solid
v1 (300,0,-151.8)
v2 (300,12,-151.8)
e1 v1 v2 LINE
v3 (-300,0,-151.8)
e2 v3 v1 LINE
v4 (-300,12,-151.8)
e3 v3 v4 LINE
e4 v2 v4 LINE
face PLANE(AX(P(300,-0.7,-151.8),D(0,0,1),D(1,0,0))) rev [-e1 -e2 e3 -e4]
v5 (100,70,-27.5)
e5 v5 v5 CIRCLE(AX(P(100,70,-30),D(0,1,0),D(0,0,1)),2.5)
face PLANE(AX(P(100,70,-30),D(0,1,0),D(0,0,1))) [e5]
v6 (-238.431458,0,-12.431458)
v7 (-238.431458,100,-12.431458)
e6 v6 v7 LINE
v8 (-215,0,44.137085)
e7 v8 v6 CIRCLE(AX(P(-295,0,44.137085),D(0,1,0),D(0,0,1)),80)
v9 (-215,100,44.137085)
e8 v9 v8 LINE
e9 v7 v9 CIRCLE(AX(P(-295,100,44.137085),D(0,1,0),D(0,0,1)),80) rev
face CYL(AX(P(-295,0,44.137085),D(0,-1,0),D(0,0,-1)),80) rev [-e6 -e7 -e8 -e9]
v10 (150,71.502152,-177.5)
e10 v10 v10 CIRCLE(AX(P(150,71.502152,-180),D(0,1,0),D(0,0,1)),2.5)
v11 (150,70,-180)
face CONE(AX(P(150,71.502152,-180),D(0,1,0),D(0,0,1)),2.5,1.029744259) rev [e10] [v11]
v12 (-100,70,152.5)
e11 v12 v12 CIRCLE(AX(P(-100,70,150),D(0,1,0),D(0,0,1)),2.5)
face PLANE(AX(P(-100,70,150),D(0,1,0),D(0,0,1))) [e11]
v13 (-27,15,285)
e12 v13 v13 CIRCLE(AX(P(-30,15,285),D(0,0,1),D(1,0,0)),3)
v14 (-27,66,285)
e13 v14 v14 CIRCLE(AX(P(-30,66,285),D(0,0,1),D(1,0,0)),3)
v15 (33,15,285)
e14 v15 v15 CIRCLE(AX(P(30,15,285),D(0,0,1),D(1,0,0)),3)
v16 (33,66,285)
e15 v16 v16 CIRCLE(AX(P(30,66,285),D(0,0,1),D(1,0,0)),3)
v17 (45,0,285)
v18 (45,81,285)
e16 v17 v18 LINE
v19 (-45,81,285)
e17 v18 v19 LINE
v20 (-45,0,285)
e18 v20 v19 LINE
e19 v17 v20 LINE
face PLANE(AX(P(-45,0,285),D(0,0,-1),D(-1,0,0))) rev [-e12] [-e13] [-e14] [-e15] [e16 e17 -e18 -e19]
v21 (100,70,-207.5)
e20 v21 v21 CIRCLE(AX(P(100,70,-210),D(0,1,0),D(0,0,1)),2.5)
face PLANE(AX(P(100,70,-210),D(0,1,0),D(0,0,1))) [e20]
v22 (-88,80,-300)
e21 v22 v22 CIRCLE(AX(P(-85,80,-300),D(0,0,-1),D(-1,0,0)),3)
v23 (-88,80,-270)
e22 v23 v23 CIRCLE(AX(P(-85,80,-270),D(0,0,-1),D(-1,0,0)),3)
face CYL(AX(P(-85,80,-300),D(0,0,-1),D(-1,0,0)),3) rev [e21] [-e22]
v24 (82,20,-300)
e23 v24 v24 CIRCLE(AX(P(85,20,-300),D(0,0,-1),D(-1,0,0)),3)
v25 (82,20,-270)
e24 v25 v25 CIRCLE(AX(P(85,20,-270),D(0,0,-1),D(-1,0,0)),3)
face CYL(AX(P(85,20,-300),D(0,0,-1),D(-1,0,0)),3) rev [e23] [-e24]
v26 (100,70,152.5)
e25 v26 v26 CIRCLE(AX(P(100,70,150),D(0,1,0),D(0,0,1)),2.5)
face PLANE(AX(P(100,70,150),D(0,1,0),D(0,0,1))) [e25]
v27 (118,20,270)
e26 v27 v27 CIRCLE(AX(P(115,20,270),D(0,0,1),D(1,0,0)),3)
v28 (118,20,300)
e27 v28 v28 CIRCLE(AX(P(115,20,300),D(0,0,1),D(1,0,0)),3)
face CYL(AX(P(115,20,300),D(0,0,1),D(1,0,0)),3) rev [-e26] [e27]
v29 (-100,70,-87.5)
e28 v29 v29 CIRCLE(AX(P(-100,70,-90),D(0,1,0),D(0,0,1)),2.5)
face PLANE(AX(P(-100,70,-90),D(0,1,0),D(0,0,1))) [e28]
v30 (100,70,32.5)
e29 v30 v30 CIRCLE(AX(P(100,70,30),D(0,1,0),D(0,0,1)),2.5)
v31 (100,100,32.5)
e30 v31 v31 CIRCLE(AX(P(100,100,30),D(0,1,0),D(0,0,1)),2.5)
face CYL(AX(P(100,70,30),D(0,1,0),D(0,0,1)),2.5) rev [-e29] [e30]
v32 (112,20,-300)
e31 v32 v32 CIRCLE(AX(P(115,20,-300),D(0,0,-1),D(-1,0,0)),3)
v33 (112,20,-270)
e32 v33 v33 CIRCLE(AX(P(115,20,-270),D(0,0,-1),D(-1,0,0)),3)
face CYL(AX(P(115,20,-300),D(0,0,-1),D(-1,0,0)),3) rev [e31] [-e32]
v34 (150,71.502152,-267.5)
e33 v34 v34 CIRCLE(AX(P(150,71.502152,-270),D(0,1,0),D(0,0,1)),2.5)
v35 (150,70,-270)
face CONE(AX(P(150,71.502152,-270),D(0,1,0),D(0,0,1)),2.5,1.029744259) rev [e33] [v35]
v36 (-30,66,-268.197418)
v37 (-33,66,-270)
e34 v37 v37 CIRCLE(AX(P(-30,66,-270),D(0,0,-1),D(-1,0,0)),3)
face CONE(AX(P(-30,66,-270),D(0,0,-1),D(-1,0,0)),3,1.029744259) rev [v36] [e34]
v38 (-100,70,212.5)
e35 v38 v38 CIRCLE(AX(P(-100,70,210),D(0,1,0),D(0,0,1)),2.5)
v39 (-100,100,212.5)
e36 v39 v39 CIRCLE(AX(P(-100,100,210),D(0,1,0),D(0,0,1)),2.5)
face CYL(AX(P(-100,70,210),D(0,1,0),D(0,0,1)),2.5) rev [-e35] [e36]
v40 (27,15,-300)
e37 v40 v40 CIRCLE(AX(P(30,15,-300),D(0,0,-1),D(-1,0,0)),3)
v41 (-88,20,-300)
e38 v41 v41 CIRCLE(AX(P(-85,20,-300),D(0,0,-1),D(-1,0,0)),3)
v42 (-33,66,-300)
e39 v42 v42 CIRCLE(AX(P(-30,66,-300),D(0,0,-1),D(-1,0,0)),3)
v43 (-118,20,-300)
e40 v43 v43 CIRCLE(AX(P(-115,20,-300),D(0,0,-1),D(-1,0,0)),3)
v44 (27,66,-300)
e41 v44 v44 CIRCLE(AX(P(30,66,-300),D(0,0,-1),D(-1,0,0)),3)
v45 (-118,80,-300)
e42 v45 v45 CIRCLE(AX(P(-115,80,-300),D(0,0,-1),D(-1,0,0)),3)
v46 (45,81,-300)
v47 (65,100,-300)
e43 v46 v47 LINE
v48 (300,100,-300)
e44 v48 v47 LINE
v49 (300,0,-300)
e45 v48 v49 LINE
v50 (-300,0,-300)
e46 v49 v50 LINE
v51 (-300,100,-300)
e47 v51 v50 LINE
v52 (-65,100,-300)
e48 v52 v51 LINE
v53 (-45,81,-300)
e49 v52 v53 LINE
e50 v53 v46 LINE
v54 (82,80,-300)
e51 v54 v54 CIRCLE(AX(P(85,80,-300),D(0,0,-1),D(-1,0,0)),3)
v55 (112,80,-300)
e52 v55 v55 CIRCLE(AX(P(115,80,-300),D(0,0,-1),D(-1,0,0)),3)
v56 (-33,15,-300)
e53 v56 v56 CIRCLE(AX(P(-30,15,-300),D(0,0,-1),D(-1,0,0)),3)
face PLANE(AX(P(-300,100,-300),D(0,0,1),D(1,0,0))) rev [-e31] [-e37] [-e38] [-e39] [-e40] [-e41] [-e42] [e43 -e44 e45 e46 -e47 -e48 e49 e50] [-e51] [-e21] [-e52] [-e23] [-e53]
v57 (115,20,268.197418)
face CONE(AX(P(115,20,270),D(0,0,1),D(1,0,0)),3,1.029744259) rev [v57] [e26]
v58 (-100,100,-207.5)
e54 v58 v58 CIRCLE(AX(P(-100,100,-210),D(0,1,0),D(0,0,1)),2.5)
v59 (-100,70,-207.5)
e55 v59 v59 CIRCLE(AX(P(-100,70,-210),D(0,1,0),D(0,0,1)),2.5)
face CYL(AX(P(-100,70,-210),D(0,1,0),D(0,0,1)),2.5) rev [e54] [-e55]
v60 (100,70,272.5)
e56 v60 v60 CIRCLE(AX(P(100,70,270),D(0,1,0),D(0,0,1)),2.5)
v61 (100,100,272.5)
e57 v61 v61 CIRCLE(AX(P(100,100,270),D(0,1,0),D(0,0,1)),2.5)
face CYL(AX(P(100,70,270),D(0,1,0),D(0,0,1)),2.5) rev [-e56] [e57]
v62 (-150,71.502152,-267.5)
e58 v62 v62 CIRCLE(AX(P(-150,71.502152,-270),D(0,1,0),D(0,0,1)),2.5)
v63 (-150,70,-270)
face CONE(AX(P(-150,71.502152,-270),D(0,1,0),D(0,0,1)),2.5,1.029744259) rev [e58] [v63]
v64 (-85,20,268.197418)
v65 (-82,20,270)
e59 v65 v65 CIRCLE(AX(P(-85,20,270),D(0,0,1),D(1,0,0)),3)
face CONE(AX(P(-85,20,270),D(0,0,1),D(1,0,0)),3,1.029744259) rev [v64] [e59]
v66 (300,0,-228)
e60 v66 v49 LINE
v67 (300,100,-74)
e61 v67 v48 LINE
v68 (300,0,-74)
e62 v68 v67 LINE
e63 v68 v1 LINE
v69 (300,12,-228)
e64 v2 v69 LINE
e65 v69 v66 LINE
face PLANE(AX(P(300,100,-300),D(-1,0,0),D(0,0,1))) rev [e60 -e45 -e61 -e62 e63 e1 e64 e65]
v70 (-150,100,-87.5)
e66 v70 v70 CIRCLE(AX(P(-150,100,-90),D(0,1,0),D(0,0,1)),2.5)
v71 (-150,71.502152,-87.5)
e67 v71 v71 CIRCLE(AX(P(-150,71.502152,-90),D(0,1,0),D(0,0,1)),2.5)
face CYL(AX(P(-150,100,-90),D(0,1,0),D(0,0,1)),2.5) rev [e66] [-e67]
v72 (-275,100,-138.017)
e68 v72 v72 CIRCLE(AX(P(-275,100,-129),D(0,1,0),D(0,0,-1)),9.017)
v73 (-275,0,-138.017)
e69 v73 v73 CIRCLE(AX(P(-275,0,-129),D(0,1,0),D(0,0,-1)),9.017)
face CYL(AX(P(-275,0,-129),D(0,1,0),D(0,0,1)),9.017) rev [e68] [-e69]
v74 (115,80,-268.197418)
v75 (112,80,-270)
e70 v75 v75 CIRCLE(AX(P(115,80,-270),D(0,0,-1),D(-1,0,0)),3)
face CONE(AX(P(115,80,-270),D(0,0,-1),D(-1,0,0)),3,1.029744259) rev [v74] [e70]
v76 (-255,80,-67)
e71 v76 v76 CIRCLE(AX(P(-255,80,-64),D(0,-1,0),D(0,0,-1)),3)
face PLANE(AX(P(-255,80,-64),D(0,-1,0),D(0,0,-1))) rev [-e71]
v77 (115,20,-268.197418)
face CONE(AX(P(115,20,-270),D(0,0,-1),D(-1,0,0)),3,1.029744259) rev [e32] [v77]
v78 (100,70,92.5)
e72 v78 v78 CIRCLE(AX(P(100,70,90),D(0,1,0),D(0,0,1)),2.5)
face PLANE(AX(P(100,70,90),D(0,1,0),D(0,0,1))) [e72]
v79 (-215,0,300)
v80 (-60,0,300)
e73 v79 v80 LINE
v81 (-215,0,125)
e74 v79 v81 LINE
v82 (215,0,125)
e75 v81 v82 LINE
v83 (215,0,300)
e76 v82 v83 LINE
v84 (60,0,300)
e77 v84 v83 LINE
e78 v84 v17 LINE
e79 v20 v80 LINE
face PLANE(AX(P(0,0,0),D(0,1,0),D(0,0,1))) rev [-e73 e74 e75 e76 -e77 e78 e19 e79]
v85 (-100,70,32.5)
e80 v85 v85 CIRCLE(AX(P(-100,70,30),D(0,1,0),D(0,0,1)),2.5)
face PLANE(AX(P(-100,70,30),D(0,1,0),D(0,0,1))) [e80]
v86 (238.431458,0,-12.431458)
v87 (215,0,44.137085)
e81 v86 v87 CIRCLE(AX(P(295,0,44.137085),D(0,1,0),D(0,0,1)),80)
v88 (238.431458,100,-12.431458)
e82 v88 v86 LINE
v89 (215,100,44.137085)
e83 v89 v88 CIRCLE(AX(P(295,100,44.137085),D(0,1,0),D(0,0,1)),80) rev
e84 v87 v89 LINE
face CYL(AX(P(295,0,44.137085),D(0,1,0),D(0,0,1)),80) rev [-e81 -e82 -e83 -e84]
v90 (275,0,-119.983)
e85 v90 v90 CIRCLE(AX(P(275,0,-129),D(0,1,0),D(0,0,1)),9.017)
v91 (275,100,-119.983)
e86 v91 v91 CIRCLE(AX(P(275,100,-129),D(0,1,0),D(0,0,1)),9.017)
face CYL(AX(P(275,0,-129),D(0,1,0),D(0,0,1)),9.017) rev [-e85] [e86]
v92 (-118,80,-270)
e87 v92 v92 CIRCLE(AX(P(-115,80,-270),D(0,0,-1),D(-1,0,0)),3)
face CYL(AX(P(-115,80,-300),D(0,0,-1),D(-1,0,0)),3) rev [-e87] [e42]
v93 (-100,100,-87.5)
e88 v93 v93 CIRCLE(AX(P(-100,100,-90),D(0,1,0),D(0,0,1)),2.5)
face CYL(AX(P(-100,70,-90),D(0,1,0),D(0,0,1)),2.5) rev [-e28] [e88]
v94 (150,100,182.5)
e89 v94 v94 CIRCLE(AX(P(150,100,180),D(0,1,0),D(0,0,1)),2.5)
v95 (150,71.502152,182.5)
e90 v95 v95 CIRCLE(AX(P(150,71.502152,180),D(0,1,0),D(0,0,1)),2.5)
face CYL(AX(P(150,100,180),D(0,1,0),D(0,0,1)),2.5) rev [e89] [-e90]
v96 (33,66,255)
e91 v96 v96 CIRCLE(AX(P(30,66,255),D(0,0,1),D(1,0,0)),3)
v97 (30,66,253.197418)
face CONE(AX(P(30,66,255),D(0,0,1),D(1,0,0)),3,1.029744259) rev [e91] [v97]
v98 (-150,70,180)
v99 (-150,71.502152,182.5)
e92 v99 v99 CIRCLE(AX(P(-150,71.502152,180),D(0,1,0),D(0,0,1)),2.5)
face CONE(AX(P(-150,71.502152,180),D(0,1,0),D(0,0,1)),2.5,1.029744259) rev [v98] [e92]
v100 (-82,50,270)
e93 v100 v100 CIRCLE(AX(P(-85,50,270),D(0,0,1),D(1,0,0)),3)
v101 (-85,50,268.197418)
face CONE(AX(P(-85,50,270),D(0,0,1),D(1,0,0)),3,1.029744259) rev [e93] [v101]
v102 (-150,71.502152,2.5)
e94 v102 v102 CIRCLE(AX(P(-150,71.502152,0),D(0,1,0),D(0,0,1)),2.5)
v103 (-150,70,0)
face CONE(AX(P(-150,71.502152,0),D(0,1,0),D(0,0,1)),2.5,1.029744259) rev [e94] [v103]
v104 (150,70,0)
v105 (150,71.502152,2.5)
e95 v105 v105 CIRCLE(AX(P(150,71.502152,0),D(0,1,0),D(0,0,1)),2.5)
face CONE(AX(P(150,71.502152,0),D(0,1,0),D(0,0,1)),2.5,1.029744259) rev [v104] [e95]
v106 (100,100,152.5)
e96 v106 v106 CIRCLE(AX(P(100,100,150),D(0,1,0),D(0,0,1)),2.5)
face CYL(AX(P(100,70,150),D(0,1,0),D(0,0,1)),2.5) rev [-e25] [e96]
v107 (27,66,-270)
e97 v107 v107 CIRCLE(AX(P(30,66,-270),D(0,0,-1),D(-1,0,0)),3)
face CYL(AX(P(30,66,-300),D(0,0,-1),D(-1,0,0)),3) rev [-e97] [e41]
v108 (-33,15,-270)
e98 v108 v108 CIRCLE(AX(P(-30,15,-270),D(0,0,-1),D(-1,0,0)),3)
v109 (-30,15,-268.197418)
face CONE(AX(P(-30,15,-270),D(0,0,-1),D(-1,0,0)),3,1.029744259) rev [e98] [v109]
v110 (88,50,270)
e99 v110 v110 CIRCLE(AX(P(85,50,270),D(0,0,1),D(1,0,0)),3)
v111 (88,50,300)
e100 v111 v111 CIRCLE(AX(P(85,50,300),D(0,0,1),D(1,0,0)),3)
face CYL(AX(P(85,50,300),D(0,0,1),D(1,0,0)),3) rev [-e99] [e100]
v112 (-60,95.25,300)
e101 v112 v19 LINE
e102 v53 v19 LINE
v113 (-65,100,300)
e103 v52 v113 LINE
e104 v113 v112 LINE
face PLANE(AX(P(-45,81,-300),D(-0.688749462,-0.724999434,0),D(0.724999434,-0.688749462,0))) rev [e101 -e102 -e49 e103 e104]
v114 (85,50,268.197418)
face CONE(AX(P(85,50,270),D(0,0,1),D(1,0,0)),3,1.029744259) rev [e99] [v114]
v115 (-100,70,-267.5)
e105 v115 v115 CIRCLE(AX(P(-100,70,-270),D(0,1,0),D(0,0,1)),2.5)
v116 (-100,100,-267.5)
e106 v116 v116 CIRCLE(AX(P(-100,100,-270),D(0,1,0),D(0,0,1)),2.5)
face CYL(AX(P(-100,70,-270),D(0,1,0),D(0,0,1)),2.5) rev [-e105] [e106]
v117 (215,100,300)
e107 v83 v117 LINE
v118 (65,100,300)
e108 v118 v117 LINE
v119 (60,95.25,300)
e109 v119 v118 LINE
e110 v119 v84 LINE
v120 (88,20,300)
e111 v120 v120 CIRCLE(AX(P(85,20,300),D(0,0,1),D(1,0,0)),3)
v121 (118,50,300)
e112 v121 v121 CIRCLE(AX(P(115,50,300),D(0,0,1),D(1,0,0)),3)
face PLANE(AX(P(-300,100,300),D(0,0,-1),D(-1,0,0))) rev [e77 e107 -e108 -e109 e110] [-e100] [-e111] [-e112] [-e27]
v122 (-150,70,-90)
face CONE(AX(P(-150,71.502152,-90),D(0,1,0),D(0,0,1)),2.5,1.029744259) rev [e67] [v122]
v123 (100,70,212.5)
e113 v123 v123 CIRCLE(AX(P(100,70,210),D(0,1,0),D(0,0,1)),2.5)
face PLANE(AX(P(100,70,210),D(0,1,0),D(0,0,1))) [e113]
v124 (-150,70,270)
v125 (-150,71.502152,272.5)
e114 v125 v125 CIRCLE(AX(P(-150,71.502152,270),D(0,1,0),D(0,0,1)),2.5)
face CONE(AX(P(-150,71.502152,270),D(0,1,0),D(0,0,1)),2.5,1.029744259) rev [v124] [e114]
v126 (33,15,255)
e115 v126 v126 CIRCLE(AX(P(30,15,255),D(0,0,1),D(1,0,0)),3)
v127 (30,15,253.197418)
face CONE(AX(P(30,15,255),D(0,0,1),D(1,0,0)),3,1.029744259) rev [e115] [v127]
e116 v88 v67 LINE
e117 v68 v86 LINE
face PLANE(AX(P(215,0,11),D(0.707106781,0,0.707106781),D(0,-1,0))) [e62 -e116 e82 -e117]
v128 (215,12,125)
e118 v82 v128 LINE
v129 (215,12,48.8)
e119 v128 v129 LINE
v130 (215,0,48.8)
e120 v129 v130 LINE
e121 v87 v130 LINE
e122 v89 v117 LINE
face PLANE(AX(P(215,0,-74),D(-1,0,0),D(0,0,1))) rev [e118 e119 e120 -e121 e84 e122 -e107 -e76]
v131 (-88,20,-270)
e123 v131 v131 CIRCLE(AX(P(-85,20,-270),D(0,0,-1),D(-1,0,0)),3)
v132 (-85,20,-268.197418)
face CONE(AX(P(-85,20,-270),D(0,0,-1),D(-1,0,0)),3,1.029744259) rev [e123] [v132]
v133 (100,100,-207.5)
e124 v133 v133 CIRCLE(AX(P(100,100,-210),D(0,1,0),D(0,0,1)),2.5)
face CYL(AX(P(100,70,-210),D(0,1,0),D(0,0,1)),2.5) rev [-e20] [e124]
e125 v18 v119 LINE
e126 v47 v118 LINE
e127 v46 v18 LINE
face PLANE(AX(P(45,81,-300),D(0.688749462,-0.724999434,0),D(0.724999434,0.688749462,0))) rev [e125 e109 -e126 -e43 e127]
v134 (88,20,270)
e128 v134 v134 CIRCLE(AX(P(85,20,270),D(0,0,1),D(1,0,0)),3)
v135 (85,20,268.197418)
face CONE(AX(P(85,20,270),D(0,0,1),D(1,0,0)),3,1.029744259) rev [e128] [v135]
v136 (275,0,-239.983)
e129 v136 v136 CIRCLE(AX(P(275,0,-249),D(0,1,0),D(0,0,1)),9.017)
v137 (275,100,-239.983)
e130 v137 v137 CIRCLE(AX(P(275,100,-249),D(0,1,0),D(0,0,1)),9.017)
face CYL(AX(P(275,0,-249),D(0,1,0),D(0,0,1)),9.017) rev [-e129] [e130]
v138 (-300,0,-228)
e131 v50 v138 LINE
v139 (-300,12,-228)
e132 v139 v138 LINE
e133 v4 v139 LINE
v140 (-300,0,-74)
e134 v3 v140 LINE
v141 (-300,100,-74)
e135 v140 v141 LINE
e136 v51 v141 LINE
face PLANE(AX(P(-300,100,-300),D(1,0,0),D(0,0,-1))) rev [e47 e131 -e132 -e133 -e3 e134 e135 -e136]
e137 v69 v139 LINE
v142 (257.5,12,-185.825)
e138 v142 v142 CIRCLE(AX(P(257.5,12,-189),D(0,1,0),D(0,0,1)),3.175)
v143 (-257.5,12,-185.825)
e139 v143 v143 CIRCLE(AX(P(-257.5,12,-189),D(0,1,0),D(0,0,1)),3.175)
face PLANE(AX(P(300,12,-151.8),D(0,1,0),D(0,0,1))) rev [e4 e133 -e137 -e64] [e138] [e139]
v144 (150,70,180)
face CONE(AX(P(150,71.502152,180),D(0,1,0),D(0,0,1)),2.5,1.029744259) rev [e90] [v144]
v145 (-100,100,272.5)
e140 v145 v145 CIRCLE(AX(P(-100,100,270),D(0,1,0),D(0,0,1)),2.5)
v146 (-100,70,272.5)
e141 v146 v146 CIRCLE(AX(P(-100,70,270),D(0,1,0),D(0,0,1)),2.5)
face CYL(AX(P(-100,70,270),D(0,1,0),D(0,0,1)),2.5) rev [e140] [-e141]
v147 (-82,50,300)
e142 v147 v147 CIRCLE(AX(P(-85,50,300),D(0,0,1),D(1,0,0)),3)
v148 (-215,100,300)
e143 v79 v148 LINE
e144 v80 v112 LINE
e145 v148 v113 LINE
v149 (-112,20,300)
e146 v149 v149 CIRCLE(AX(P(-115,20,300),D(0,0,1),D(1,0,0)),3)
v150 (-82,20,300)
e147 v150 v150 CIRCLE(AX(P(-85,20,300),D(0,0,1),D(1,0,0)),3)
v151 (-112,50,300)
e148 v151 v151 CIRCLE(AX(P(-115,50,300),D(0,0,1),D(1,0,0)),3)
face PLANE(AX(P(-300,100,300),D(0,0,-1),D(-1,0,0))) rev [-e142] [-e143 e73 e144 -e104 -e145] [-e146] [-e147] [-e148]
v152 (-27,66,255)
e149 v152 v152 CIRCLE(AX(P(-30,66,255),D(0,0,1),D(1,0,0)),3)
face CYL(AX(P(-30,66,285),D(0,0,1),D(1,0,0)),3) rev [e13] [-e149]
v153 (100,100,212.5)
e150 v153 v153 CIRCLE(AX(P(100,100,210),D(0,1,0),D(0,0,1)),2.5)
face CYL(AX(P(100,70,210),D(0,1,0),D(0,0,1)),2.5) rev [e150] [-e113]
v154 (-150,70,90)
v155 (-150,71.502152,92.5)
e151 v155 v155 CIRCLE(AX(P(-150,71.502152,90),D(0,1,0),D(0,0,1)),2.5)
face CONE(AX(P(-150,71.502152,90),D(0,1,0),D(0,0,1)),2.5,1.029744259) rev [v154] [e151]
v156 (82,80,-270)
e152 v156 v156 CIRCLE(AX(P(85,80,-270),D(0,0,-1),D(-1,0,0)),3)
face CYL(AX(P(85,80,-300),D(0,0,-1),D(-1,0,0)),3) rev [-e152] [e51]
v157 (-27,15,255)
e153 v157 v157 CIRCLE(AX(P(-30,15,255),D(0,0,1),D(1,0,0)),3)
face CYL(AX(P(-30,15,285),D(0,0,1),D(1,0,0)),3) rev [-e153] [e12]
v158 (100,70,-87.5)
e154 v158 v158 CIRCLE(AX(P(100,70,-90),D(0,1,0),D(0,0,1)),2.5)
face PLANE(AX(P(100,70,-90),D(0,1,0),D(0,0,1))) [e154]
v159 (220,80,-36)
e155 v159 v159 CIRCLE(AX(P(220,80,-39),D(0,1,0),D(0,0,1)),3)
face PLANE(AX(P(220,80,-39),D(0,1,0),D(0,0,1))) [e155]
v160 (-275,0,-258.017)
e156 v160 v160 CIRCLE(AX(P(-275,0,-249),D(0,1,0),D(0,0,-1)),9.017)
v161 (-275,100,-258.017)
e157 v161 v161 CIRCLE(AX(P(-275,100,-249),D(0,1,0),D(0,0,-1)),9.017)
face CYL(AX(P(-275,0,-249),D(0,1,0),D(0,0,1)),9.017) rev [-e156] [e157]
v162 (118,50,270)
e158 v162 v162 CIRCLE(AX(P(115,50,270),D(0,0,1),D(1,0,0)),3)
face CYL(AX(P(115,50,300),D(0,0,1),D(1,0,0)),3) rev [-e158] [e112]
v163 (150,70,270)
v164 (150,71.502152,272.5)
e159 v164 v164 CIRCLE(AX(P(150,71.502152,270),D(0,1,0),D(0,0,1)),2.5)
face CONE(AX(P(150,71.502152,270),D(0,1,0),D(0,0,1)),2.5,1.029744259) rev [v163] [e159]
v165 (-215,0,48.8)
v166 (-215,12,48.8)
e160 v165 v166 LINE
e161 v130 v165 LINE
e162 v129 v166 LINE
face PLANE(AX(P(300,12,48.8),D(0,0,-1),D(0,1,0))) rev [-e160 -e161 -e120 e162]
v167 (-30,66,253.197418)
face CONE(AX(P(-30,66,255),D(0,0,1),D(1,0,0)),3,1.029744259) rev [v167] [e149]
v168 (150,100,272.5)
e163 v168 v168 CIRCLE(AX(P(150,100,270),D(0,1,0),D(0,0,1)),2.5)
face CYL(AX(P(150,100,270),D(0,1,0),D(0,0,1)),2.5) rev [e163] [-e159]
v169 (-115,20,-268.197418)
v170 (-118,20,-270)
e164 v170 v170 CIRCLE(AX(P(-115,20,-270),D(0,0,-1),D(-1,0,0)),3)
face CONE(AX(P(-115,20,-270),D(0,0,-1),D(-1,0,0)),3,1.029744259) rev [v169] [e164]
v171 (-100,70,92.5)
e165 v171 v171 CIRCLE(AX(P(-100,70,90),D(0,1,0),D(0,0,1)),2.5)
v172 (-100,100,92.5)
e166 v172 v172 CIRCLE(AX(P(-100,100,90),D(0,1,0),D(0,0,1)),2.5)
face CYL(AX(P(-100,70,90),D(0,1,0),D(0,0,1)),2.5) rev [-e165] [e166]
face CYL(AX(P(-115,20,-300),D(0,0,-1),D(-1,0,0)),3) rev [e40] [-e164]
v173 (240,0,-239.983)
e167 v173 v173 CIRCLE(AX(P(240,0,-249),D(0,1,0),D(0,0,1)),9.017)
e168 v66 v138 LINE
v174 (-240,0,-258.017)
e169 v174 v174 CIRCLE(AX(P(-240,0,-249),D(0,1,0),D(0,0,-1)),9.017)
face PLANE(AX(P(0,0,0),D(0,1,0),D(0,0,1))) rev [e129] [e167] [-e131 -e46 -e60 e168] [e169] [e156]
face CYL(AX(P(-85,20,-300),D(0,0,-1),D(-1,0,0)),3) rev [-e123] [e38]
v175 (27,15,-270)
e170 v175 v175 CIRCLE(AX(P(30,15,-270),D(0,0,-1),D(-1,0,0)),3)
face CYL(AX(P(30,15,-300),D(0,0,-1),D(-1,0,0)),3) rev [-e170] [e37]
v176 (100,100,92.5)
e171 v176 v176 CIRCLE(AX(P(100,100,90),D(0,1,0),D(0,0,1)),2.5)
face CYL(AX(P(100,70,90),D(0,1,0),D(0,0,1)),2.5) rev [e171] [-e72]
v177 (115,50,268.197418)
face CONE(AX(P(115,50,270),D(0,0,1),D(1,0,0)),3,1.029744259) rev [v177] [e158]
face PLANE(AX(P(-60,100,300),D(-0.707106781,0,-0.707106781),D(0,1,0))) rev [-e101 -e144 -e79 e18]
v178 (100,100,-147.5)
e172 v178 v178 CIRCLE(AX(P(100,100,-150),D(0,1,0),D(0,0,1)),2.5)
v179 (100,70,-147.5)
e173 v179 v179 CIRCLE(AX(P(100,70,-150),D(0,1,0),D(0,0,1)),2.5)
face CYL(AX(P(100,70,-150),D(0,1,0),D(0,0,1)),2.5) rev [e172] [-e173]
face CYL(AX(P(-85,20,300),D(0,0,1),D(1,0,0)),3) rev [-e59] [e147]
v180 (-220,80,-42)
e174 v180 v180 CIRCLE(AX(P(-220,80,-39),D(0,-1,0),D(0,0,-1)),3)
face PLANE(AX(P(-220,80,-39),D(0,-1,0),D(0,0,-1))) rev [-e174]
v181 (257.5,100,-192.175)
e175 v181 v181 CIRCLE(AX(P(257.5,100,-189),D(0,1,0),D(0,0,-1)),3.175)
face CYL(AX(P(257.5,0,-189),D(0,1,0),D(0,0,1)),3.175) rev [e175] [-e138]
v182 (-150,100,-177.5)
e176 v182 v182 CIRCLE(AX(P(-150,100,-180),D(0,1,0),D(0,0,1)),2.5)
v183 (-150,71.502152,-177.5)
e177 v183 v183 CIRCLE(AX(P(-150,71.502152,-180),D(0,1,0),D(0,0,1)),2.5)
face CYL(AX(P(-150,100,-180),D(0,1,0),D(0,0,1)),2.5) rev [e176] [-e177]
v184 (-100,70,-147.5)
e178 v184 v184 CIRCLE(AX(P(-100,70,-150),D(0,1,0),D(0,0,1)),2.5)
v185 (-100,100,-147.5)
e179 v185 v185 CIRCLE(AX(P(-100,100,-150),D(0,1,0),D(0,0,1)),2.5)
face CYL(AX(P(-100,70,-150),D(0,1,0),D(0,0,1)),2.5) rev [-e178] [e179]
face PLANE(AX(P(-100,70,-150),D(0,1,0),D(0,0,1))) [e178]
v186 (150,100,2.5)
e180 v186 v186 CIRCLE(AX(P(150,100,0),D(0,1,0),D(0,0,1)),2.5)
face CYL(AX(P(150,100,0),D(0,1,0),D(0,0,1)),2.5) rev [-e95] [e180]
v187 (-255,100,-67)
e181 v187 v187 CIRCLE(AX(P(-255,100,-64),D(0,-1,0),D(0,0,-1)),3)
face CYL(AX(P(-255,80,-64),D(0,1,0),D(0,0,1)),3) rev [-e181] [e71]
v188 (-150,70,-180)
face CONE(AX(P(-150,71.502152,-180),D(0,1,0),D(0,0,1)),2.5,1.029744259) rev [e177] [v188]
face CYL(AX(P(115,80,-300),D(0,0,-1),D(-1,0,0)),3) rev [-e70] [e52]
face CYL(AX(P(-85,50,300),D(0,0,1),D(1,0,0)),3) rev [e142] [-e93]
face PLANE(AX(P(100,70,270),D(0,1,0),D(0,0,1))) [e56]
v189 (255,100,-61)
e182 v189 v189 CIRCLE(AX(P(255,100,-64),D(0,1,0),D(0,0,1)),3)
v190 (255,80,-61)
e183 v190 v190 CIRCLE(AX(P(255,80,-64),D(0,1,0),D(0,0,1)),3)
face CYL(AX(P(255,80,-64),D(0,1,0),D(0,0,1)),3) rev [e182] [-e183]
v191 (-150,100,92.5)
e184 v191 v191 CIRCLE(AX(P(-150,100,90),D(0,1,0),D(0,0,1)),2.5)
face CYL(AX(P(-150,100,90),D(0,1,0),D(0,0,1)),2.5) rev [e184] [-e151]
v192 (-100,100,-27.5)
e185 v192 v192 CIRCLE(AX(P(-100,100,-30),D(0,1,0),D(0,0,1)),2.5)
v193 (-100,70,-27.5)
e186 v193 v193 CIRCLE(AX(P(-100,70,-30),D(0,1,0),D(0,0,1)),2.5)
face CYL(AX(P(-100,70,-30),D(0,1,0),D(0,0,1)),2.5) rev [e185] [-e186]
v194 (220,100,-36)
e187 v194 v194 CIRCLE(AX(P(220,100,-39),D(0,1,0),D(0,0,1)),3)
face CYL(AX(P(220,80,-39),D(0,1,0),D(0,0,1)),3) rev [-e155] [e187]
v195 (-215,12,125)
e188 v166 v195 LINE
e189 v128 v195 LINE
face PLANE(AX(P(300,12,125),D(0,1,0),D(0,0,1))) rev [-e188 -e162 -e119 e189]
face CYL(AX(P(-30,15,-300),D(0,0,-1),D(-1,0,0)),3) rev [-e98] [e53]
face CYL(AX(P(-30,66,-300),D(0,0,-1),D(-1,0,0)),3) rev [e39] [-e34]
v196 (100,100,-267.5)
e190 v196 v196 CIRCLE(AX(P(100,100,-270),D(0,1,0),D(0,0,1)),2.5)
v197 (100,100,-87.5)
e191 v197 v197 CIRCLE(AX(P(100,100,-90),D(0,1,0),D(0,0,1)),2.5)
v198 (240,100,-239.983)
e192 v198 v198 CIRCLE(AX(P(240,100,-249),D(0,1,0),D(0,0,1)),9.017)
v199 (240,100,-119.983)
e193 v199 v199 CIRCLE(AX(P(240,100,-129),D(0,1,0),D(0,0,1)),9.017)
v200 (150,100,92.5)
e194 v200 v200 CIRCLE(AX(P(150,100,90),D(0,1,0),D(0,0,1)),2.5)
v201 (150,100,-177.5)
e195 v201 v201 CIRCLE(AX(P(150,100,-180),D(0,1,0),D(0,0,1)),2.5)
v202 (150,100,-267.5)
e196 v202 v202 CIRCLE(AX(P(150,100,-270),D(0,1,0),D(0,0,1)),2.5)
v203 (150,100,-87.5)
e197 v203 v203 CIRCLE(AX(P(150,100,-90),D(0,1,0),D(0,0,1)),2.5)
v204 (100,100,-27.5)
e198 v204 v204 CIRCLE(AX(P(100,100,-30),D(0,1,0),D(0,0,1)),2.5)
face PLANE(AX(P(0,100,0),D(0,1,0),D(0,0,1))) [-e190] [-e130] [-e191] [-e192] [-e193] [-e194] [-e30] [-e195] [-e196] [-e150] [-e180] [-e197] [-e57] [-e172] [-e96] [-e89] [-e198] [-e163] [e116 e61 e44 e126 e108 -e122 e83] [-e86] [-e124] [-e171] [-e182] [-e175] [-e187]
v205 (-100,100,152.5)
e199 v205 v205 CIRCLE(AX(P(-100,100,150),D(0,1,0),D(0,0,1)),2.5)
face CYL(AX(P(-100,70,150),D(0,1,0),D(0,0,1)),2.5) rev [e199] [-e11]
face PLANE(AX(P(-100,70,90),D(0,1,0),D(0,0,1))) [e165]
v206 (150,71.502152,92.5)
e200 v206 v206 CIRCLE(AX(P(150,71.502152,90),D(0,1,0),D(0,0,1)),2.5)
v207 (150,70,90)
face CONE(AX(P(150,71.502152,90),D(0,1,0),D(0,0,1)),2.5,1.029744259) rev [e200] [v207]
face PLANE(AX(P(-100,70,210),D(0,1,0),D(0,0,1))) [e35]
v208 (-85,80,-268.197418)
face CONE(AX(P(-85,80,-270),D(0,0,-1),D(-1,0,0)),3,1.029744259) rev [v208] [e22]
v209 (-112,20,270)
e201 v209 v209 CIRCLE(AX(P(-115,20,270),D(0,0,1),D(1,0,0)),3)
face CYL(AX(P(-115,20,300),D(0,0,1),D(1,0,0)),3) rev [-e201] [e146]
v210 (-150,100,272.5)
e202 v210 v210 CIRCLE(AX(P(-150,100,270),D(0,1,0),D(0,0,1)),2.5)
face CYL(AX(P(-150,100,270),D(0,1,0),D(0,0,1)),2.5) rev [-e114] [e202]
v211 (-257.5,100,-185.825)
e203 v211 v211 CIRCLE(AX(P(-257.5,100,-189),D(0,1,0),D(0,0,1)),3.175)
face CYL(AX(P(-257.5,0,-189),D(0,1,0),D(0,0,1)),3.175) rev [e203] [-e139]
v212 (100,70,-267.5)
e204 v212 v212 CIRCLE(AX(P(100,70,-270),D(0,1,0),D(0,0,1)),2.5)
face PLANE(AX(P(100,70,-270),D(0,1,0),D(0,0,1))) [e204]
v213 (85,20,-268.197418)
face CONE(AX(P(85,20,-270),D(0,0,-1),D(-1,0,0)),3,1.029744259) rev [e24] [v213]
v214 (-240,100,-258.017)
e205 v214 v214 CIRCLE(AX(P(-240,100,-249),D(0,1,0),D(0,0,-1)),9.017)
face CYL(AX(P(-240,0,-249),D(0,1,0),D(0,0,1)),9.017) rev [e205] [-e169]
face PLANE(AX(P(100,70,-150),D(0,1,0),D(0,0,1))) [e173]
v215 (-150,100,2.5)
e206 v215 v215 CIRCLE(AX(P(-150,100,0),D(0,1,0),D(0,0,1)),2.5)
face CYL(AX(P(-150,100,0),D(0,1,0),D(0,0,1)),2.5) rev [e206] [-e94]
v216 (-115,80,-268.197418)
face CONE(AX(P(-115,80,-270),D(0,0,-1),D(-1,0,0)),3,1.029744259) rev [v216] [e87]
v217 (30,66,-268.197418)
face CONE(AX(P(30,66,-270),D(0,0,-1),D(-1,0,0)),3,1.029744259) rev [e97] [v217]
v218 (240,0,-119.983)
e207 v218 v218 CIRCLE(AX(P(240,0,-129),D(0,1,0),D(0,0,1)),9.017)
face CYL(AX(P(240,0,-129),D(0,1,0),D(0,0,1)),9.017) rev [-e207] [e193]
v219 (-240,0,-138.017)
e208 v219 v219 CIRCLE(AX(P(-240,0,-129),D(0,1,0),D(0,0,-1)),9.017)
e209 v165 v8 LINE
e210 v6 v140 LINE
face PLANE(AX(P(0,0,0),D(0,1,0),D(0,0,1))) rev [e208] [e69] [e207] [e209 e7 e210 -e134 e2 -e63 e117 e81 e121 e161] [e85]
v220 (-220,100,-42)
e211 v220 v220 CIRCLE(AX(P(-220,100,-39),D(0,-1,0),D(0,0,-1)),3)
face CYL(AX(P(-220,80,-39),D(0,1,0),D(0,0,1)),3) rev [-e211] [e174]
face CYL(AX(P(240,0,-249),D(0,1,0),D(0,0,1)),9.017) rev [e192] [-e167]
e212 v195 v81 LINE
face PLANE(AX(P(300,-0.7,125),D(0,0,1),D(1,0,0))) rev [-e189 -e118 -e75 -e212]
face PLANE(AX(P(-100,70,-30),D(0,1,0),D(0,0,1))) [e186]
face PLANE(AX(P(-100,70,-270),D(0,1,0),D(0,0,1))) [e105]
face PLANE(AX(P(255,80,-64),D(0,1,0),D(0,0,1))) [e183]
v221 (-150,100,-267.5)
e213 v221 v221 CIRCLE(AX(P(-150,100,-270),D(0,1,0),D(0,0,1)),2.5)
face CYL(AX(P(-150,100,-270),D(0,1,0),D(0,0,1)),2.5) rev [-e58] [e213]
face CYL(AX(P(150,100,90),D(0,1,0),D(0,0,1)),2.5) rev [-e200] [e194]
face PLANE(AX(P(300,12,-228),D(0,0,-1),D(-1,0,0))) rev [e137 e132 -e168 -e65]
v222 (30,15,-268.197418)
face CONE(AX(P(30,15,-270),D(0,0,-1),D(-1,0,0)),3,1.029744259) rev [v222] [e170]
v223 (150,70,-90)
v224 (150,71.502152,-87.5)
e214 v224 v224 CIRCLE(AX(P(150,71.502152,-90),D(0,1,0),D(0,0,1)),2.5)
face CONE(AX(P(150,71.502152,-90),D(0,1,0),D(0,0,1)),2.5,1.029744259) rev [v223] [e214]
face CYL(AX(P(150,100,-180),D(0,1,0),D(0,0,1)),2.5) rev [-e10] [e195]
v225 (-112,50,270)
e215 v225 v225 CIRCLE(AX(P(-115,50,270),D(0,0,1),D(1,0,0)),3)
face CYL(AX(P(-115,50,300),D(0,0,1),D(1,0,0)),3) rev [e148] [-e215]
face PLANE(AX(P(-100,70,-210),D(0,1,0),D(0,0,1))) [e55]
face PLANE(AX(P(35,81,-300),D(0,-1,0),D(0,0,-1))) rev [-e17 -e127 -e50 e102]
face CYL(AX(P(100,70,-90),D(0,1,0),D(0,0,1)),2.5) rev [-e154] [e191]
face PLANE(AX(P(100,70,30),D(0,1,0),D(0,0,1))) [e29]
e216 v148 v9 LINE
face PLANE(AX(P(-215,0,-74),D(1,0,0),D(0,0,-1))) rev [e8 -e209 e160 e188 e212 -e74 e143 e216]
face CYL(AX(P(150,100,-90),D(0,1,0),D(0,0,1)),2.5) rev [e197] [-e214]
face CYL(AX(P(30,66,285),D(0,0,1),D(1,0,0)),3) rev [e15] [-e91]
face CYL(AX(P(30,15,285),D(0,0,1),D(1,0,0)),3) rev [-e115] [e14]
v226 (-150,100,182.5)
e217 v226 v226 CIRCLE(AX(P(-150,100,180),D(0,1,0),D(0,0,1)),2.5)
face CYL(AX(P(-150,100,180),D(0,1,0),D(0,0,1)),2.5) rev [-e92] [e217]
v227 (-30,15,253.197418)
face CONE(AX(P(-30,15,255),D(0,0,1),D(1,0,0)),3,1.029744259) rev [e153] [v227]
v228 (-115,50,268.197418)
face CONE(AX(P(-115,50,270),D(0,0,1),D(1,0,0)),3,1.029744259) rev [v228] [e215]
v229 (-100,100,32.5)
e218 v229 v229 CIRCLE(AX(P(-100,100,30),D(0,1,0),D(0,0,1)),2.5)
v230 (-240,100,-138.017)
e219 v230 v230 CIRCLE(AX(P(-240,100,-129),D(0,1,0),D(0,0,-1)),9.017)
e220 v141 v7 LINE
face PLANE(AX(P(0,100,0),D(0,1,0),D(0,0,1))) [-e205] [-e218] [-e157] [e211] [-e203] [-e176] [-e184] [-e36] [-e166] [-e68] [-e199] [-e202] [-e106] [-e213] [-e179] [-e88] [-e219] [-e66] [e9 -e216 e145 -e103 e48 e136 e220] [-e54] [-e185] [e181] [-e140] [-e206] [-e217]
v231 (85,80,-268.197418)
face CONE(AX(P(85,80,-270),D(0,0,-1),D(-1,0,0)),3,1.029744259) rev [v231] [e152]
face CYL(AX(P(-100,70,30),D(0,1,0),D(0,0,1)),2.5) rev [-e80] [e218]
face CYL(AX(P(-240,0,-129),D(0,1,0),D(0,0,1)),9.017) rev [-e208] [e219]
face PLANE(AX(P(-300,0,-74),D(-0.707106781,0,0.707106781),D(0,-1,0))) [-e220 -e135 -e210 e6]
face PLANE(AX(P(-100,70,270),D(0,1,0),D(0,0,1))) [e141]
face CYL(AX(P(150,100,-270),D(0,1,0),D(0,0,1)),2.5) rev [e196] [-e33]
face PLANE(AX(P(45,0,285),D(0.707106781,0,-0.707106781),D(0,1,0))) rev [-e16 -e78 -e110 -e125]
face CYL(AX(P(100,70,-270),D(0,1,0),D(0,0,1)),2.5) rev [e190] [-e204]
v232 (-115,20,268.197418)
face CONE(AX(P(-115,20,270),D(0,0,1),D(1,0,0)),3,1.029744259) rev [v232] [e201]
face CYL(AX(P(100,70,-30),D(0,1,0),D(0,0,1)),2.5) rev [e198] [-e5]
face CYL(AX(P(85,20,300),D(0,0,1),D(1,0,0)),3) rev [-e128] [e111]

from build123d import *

# Parameters (mm, degrees)
SKETCH1_W                           = 600
SKETCH1_H                           = 600
BOSS_EXTRUDE1_DEPTH                 = 100
CUT_EXTRUDE1_DEPTH                  = 436.889894354
CHAMFER5_SIZE                       = 85
CUT_EXTRUDE2_DEPTH                  = 679.232998313
SKETCH9_R                           = 9.017
CUT_EXTRUDE5_DEPTH                  = 436.889894354
SKETCH12_R                          = 2.5
CUT_EXTRUDE7_DEPTH                  = 30
SKETCH14_W                          = 90
SKETCH14_H                          = 15
CUT_EXTRUDE8_DEPTH                  = 432.927077179
CHAMFER3_SIZE                       = 15
SKETCH15_W                          = 76.2
SKETCH15_H                          = 12.7
CUT_EXTRUDE9_DEPTH                  = 679.232998313
F_6_0MM_DOWEL_HOLE1_D               = 6
F_6_0MM_DOWEL_HOLE1_DEPTH           = 30
F_6_0MM_DOWEL_HOLE1_TIP             = 1.802581857
F_6_0MM_DOWEL_HOLE1_ON_FACE_2_D     = 6
F_6_0MM_DOWEL_HOLE1_ON_FACE_2_DEPTH = 30
F_6_0MM_DOWEL_HOLE1_ON_FACE_2_TIP   = 1.802581857
F_6_0MM_DOWEL_HOLE1_ON_FACE_3_D     = 6
F_6_0MM_DOWEL_HOLE1_ON_FACE_3_DEPTH = 30
F_6_0MM_DOWEL_HOLE1_ON_FACE_3_TIP   = 1.802581857
SKETCH23_R                          = 3.175
CUT_EXTRUDE10_DEPTH                 = 436.889894354
SKETCH24_R                          = 3
CUT_EXTRUDE11_DEPTH                 = 20
FILLET1_R                           = 80
F_5_0MM_DOWEL_HOLE1_D               = 5
F_5_0MM_DOWEL_HOLE1_DEPTH           = 28.497848452
F_5_0MM_DOWEL_HOLE1_TIP             = 1.502151548


with BuildPart() as part:
    # Sketch1 → Boss-Extrude1 (new body)
    with BuildSketch(Plane(origin=(0, 0, 0), x_dir=(1, 0, 0), z_dir=(0, 1, 0))):
        Rectangle(SKETCH1_W, SKETCH1_H)
    extrude(amount=BOSS_EXTRUDE1_DEPTH)

    # Sketch2 → Cut-Extrude1 (cut, through all)
    with BuildSketch(Plane(origin=(0, 100, 0), x_dir=(1, 0, 0), z_dir=(0, 1, 0))):
        Polygon((-300, -300), (-220, -300), (-215, -300), (-215, 74), (-220, 74), (-300, 74), (-300, 60), align=None)
        Polygon((300, -300), (220, -300), (215, -300), (215, 74), (220, 74), (300, 74), (300, 60), align=None)
    extrude(amount=-CUT_EXTRUDE1_DEPTH, mode=Mode.SUBTRACT)

    # Chamfer5
    chamfer5_edges = [part.edges().sort_by_distance(p)[0] for p in [
        (-215, 50, -74),
        (215, 50, -74),
    ]]
    chamfer(chamfer5_edges, length=CHAMFER5_SIZE - 0.0001)  # a hair under: the kernel refuses the full size

    # Sketch3 → Cut-Extrude2 (cut, through all)
    with BuildSketch(Plane.XY.offset(300)):
        Polygon((-35, 81), (-45, 81), (-65, 100), (-45, 100), (45, 100), (65, 100), (45, 81), (35, 81), (0, 81), align=None)
    extrude(amount=-CUT_EXTRUDE2_DEPTH, mode=Mode.SUBTRACT)

    # Sketch9 → Cut-Extrude5 (cut, through all)
    with BuildSketch(Plane(origin=(0, 100, 0), x_dir=(1, 0, 0), z_dir=(0, 1, 0))):
        with Locations(Location((275, 129, 0), (0, 0, 270))):
            Circle(SKETCH9_R)
        with Locations(Location((240, 129, 0), (0, 0, 270))):
            Circle(SKETCH9_R)
        with Locations(Location((240, 249, 0), (0, 0, 270))):
            Circle(SKETCH9_R)
        with Locations(Location((275, 249, 0), (0, 0, 270))):
            Circle(SKETCH9_R)
        with Locations(Location((-275, 129, 0), (0, 0, 90))):
            Circle(SKETCH9_R)
        with Locations(Location((-240, 249, 0), (0, 0, 90))):
            Circle(SKETCH9_R)
        with Locations(Location((-275, 249, 0), (0, 0, 90))):
            Circle(SKETCH9_R)
        with Locations(Location((-240, 129, 0), (0, 0, 90))):
            Circle(SKETCH9_R)
    extrude(amount=-CUT_EXTRUDE5_DEPTH, mode=Mode.SUBTRACT)

    # Sketch12 → Cut-Extrude7 (cut)
    with BuildSketch(Plane(origin=(0, 100, 0), x_dir=(1, 0, 0), z_dir=(0, 1, 0))):
        with Locations(Location((-100, -270, 0), (0, 0, 270))):
            Circle(SKETCH12_R)
        with Locations(Location((100, -270, 0), (0, 0, 270))):
            Circle(SKETCH12_R)
        with Locations(Location((100, -210, 0), (0, 0, 270))):
            Circle(SKETCH12_R)
        with Locations(Location((100, -150, 0), (0, 0, 270))):
            Circle(SKETCH12_R)
        with Locations(Location((100, -90, 0), (0, 0, 270))):
            Circle(SKETCH12_R)
        with Locations(Location((100, -30, 0), (0, 0, 270))):
            Circle(SKETCH12_R)
        with Locations(Location((100, 30, 0), (0, 0, 270))):
            Circle(SKETCH12_R)
        with Locations(Location((100, 90, 0), (0, 0, 270))):
            Circle(SKETCH12_R)
        with Locations(Location((100, 150, 0), (0, 0, 270))):
            Circle(SKETCH12_R)
        with Locations(Location((100, 210, 0), (0, 0, 270))):
            Circle(SKETCH12_R)
        with Locations(Location((100, 270, 0), (0, 0, 270))):
            Circle(SKETCH12_R)
        with Locations(Location((-100, -210, 0), (0, 0, 270))):
            Circle(SKETCH12_R)
        with Locations(Location((-100, -150, 0), (0, 0, 270))):
            Circle(SKETCH12_R)
        with Locations(Location((-100, -90, 0), (0, 0, 270))):
            Circle(SKETCH12_R)
        with Locations(Location((-100, -30, 0), (0, 0, 270))):
            Circle(SKETCH12_R)
        with Locations(Location((-100, 30, 0), (0, 0, 270))):
            Circle(SKETCH12_R)
        with Locations(Location((-100, 90, 0), (0, 0, 270))):
            Circle(SKETCH12_R)
        with Locations(Location((-100, 150, 0), (0, 0, 270))):
            Circle(SKETCH12_R)
        with Locations(Location((-100, 210, 0), (0, 0, 270))):
            Circle(SKETCH12_R)
        with Locations(Location((-100, 270, 0), (0, 0, 270))):
            Circle(SKETCH12_R)
    extrude(amount=-CUT_EXTRUDE7_DEPTH, mode=Mode.SUBTRACT)

    # Sketch14 → Cut-Extrude8 (cut, through all)
    with BuildSketch(Plane(origin=(0, 81, 0), x_dir=(1, 0, 0), z_dir=(0, 1, 0))):
        with Locations((0, -292.5)):
            Rectangle(SKETCH14_W, SKETCH14_H)
    extrude(amount=-CUT_EXTRUDE8_DEPTH, mode=Mode.SUBTRACT)

    # Chamfer3
    chamfer3_edges = [part.edges().sort_by_distance(p)[0] for p in [
        (45, 40.5, 300),
        (-45, 40.5, 300),
    ]]
    chamfer(chamfer3_edges, length=CHAMFER3_SIZE - 0.0001)  # a hair under: the kernel refuses the full size

    # Sketch15 → Cut-Extrude9 (cut, through all)
    with BuildSketch(Plane.ZY.offset(300)):
        with Locations((86.9, 5.65)):
            Rectangle(SKETCH15_W, SKETCH15_H)
        with Locations((-189.9, 5.65)):
            Rectangle(SKETCH15_W, SKETCH15_H)
    extrude(amount=-CUT_EXTRUDE9_DEPTH, mode=Mode.SUBTRACT)

    # Ø6.0mm Dowel Hole1
    with Locations(Plane(origin=(-30, 66, 285), x_dir=(1, 0, 0), z_dir=(0, 0, 1))):
        with Locations((0, 0), (60, 0), (60, -51), (0, -51)):
            Hole(F_6_0MM_DOWEL_HOLE1_D / 2, depth=F_6_0MM_DOWEL_HOLE1_DEPTH)
            with Locations((0, 0, -(F_6_0MM_DOWEL_HOLE1_DEPTH + F_6_0MM_DOWEL_HOLE1_TIP / 2))):  # 118° drill point
                Cone(0, F_6_0MM_DOWEL_HOLE1_D / 2, F_6_0MM_DOWEL_HOLE1_TIP, mode=Mode.SUBTRACT)

    # Ø6.0mm Dowel Hole1 on face 2
    with Locations(Plane(origin=(30, 66, -300), x_dir=(-1, 0, 0), z_dir=(0, 0, -1))):
        with Locations((0, 0), (60, 0), (60, -51), (0, -51), (145, 14), (115, 14), (-55, 14), (-85, 14), (145, -46), (115, -46), (-55, -46), (-85, -46)):
            Hole(F_6_0MM_DOWEL_HOLE1_ON_FACE_2_D / 2, depth=F_6_0MM_DOWEL_HOLE1_ON_FACE_2_DEPTH)
            with Locations((0, 0, -(F_6_0MM_DOWEL_HOLE1_ON_FACE_2_DEPTH + F_6_0MM_DOWEL_HOLE1_ON_FACE_2_TIP / 2))):  # 118° drill point
                Cone(0, F_6_0MM_DOWEL_HOLE1_ON_FACE_2_D / 2, F_6_0MM_DOWEL_HOLE1_ON_FACE_2_TIP, mode=Mode.SUBTRACT)

    # Ø6.0mm Dowel Hole1 on face 3
    with Locations(Plane(origin=(-85, 50, 300), x_dir=(1, 0, 0), z_dir=(0, 0, 1))):
        with Locations((0, 0), (-30, 0), (170, 0), (200, 0), (-30, -30), (0, -30), (170, -30), (200, -30)):
            Hole(F_6_0MM_DOWEL_HOLE1_ON_FACE_3_D / 2, depth=F_6_0MM_DOWEL_HOLE1_ON_FACE_3_DEPTH)
            with Locations((0, 0, -(F_6_0MM_DOWEL_HOLE1_ON_FACE_3_DEPTH + F_6_0MM_DOWEL_HOLE1_ON_FACE_3_TIP / 2))):  # 118° drill point
                Cone(0, F_6_0MM_DOWEL_HOLE1_ON_FACE_3_D / 2, F_6_0MM_DOWEL_HOLE1_ON_FACE_3_TIP, mode=Mode.SUBTRACT)

    # Sketch23 → Cut-Extrude10 (cut, through all)
    with BuildSketch(Plane(origin=(0, 100, 0), x_dir=(1, 0, 0), z_dir=(0, 1, 0))):
        with Locations(Location((-257.5, 189, 0), (0, 0, 270))):
            Circle(SKETCH23_R)
        with Locations(Location((257.5, 189, 0), (0, 0, 270))):
            Circle(SKETCH23_R)
    extrude(amount=-CUT_EXTRUDE10_DEPTH, mode=Mode.SUBTRACT)

    # Sketch24 → Cut-Extrude11 (cut)
    with BuildSketch(Plane(origin=(0, 100, 0), x_dir=(1, 0, 0), z_dir=(0, 1, 0))):
        with Locations(Location((255, 64, 0), (0, 0, 270))):
            Circle(SKETCH24_R)
        with Locations(Location((220, 39, 0), (0, 0, 270))):
            Circle(SKETCH24_R)
        with Locations(Location((-220, 39, 0), (0, 0, 90))):
            Circle(SKETCH24_R)
        with Locations(Location((-255, 64, 0), (0, 0, 90))):
            Circle(SKETCH24_R)
    extrude(amount=-CUT_EXTRUDE11_DEPTH, mode=Mode.SUBTRACT)

    # Fillet1
    fillet1_edges = [part.edges().sort_by_distance(p)[0] for p in [
        (-215, 50, 10.9999),
        (215, 50, 10.9999),
    ]]
    fillet(fillet1_edges, radius=FILLET1_R)

    # Ø5.0mm Dowel Hole1
    with Locations(Plane(origin=(0, 100, 0), x_dir=(1, 0, 0), z_dir=(0, 1, 0))):
        with Locations((-150, 270), (150, 270), (-150, 90), (150, 90), (-150, -90), (150, -90), (-150, -270), (150, -270), (150, 180), (-150, 180), (-150, 0), (150, 0), (150, -180), (-150, -180)):
            Hole(F_5_0MM_DOWEL_HOLE1_D / 2, depth=F_5_0MM_DOWEL_HOLE1_DEPTH)
            with Locations((0, 0, -(F_5_0MM_DOWEL_HOLE1_DEPTH + F_5_0MM_DOWEL_HOLE1_TIP / 2))):  # 118° drill point
                Cone(0, F_5_0MM_DOWEL_HOLE1_D / 2, F_5_0MM_DOWEL_HOLE1_TIP, mode=Mode.SUBTRACT)


solid = part.part
